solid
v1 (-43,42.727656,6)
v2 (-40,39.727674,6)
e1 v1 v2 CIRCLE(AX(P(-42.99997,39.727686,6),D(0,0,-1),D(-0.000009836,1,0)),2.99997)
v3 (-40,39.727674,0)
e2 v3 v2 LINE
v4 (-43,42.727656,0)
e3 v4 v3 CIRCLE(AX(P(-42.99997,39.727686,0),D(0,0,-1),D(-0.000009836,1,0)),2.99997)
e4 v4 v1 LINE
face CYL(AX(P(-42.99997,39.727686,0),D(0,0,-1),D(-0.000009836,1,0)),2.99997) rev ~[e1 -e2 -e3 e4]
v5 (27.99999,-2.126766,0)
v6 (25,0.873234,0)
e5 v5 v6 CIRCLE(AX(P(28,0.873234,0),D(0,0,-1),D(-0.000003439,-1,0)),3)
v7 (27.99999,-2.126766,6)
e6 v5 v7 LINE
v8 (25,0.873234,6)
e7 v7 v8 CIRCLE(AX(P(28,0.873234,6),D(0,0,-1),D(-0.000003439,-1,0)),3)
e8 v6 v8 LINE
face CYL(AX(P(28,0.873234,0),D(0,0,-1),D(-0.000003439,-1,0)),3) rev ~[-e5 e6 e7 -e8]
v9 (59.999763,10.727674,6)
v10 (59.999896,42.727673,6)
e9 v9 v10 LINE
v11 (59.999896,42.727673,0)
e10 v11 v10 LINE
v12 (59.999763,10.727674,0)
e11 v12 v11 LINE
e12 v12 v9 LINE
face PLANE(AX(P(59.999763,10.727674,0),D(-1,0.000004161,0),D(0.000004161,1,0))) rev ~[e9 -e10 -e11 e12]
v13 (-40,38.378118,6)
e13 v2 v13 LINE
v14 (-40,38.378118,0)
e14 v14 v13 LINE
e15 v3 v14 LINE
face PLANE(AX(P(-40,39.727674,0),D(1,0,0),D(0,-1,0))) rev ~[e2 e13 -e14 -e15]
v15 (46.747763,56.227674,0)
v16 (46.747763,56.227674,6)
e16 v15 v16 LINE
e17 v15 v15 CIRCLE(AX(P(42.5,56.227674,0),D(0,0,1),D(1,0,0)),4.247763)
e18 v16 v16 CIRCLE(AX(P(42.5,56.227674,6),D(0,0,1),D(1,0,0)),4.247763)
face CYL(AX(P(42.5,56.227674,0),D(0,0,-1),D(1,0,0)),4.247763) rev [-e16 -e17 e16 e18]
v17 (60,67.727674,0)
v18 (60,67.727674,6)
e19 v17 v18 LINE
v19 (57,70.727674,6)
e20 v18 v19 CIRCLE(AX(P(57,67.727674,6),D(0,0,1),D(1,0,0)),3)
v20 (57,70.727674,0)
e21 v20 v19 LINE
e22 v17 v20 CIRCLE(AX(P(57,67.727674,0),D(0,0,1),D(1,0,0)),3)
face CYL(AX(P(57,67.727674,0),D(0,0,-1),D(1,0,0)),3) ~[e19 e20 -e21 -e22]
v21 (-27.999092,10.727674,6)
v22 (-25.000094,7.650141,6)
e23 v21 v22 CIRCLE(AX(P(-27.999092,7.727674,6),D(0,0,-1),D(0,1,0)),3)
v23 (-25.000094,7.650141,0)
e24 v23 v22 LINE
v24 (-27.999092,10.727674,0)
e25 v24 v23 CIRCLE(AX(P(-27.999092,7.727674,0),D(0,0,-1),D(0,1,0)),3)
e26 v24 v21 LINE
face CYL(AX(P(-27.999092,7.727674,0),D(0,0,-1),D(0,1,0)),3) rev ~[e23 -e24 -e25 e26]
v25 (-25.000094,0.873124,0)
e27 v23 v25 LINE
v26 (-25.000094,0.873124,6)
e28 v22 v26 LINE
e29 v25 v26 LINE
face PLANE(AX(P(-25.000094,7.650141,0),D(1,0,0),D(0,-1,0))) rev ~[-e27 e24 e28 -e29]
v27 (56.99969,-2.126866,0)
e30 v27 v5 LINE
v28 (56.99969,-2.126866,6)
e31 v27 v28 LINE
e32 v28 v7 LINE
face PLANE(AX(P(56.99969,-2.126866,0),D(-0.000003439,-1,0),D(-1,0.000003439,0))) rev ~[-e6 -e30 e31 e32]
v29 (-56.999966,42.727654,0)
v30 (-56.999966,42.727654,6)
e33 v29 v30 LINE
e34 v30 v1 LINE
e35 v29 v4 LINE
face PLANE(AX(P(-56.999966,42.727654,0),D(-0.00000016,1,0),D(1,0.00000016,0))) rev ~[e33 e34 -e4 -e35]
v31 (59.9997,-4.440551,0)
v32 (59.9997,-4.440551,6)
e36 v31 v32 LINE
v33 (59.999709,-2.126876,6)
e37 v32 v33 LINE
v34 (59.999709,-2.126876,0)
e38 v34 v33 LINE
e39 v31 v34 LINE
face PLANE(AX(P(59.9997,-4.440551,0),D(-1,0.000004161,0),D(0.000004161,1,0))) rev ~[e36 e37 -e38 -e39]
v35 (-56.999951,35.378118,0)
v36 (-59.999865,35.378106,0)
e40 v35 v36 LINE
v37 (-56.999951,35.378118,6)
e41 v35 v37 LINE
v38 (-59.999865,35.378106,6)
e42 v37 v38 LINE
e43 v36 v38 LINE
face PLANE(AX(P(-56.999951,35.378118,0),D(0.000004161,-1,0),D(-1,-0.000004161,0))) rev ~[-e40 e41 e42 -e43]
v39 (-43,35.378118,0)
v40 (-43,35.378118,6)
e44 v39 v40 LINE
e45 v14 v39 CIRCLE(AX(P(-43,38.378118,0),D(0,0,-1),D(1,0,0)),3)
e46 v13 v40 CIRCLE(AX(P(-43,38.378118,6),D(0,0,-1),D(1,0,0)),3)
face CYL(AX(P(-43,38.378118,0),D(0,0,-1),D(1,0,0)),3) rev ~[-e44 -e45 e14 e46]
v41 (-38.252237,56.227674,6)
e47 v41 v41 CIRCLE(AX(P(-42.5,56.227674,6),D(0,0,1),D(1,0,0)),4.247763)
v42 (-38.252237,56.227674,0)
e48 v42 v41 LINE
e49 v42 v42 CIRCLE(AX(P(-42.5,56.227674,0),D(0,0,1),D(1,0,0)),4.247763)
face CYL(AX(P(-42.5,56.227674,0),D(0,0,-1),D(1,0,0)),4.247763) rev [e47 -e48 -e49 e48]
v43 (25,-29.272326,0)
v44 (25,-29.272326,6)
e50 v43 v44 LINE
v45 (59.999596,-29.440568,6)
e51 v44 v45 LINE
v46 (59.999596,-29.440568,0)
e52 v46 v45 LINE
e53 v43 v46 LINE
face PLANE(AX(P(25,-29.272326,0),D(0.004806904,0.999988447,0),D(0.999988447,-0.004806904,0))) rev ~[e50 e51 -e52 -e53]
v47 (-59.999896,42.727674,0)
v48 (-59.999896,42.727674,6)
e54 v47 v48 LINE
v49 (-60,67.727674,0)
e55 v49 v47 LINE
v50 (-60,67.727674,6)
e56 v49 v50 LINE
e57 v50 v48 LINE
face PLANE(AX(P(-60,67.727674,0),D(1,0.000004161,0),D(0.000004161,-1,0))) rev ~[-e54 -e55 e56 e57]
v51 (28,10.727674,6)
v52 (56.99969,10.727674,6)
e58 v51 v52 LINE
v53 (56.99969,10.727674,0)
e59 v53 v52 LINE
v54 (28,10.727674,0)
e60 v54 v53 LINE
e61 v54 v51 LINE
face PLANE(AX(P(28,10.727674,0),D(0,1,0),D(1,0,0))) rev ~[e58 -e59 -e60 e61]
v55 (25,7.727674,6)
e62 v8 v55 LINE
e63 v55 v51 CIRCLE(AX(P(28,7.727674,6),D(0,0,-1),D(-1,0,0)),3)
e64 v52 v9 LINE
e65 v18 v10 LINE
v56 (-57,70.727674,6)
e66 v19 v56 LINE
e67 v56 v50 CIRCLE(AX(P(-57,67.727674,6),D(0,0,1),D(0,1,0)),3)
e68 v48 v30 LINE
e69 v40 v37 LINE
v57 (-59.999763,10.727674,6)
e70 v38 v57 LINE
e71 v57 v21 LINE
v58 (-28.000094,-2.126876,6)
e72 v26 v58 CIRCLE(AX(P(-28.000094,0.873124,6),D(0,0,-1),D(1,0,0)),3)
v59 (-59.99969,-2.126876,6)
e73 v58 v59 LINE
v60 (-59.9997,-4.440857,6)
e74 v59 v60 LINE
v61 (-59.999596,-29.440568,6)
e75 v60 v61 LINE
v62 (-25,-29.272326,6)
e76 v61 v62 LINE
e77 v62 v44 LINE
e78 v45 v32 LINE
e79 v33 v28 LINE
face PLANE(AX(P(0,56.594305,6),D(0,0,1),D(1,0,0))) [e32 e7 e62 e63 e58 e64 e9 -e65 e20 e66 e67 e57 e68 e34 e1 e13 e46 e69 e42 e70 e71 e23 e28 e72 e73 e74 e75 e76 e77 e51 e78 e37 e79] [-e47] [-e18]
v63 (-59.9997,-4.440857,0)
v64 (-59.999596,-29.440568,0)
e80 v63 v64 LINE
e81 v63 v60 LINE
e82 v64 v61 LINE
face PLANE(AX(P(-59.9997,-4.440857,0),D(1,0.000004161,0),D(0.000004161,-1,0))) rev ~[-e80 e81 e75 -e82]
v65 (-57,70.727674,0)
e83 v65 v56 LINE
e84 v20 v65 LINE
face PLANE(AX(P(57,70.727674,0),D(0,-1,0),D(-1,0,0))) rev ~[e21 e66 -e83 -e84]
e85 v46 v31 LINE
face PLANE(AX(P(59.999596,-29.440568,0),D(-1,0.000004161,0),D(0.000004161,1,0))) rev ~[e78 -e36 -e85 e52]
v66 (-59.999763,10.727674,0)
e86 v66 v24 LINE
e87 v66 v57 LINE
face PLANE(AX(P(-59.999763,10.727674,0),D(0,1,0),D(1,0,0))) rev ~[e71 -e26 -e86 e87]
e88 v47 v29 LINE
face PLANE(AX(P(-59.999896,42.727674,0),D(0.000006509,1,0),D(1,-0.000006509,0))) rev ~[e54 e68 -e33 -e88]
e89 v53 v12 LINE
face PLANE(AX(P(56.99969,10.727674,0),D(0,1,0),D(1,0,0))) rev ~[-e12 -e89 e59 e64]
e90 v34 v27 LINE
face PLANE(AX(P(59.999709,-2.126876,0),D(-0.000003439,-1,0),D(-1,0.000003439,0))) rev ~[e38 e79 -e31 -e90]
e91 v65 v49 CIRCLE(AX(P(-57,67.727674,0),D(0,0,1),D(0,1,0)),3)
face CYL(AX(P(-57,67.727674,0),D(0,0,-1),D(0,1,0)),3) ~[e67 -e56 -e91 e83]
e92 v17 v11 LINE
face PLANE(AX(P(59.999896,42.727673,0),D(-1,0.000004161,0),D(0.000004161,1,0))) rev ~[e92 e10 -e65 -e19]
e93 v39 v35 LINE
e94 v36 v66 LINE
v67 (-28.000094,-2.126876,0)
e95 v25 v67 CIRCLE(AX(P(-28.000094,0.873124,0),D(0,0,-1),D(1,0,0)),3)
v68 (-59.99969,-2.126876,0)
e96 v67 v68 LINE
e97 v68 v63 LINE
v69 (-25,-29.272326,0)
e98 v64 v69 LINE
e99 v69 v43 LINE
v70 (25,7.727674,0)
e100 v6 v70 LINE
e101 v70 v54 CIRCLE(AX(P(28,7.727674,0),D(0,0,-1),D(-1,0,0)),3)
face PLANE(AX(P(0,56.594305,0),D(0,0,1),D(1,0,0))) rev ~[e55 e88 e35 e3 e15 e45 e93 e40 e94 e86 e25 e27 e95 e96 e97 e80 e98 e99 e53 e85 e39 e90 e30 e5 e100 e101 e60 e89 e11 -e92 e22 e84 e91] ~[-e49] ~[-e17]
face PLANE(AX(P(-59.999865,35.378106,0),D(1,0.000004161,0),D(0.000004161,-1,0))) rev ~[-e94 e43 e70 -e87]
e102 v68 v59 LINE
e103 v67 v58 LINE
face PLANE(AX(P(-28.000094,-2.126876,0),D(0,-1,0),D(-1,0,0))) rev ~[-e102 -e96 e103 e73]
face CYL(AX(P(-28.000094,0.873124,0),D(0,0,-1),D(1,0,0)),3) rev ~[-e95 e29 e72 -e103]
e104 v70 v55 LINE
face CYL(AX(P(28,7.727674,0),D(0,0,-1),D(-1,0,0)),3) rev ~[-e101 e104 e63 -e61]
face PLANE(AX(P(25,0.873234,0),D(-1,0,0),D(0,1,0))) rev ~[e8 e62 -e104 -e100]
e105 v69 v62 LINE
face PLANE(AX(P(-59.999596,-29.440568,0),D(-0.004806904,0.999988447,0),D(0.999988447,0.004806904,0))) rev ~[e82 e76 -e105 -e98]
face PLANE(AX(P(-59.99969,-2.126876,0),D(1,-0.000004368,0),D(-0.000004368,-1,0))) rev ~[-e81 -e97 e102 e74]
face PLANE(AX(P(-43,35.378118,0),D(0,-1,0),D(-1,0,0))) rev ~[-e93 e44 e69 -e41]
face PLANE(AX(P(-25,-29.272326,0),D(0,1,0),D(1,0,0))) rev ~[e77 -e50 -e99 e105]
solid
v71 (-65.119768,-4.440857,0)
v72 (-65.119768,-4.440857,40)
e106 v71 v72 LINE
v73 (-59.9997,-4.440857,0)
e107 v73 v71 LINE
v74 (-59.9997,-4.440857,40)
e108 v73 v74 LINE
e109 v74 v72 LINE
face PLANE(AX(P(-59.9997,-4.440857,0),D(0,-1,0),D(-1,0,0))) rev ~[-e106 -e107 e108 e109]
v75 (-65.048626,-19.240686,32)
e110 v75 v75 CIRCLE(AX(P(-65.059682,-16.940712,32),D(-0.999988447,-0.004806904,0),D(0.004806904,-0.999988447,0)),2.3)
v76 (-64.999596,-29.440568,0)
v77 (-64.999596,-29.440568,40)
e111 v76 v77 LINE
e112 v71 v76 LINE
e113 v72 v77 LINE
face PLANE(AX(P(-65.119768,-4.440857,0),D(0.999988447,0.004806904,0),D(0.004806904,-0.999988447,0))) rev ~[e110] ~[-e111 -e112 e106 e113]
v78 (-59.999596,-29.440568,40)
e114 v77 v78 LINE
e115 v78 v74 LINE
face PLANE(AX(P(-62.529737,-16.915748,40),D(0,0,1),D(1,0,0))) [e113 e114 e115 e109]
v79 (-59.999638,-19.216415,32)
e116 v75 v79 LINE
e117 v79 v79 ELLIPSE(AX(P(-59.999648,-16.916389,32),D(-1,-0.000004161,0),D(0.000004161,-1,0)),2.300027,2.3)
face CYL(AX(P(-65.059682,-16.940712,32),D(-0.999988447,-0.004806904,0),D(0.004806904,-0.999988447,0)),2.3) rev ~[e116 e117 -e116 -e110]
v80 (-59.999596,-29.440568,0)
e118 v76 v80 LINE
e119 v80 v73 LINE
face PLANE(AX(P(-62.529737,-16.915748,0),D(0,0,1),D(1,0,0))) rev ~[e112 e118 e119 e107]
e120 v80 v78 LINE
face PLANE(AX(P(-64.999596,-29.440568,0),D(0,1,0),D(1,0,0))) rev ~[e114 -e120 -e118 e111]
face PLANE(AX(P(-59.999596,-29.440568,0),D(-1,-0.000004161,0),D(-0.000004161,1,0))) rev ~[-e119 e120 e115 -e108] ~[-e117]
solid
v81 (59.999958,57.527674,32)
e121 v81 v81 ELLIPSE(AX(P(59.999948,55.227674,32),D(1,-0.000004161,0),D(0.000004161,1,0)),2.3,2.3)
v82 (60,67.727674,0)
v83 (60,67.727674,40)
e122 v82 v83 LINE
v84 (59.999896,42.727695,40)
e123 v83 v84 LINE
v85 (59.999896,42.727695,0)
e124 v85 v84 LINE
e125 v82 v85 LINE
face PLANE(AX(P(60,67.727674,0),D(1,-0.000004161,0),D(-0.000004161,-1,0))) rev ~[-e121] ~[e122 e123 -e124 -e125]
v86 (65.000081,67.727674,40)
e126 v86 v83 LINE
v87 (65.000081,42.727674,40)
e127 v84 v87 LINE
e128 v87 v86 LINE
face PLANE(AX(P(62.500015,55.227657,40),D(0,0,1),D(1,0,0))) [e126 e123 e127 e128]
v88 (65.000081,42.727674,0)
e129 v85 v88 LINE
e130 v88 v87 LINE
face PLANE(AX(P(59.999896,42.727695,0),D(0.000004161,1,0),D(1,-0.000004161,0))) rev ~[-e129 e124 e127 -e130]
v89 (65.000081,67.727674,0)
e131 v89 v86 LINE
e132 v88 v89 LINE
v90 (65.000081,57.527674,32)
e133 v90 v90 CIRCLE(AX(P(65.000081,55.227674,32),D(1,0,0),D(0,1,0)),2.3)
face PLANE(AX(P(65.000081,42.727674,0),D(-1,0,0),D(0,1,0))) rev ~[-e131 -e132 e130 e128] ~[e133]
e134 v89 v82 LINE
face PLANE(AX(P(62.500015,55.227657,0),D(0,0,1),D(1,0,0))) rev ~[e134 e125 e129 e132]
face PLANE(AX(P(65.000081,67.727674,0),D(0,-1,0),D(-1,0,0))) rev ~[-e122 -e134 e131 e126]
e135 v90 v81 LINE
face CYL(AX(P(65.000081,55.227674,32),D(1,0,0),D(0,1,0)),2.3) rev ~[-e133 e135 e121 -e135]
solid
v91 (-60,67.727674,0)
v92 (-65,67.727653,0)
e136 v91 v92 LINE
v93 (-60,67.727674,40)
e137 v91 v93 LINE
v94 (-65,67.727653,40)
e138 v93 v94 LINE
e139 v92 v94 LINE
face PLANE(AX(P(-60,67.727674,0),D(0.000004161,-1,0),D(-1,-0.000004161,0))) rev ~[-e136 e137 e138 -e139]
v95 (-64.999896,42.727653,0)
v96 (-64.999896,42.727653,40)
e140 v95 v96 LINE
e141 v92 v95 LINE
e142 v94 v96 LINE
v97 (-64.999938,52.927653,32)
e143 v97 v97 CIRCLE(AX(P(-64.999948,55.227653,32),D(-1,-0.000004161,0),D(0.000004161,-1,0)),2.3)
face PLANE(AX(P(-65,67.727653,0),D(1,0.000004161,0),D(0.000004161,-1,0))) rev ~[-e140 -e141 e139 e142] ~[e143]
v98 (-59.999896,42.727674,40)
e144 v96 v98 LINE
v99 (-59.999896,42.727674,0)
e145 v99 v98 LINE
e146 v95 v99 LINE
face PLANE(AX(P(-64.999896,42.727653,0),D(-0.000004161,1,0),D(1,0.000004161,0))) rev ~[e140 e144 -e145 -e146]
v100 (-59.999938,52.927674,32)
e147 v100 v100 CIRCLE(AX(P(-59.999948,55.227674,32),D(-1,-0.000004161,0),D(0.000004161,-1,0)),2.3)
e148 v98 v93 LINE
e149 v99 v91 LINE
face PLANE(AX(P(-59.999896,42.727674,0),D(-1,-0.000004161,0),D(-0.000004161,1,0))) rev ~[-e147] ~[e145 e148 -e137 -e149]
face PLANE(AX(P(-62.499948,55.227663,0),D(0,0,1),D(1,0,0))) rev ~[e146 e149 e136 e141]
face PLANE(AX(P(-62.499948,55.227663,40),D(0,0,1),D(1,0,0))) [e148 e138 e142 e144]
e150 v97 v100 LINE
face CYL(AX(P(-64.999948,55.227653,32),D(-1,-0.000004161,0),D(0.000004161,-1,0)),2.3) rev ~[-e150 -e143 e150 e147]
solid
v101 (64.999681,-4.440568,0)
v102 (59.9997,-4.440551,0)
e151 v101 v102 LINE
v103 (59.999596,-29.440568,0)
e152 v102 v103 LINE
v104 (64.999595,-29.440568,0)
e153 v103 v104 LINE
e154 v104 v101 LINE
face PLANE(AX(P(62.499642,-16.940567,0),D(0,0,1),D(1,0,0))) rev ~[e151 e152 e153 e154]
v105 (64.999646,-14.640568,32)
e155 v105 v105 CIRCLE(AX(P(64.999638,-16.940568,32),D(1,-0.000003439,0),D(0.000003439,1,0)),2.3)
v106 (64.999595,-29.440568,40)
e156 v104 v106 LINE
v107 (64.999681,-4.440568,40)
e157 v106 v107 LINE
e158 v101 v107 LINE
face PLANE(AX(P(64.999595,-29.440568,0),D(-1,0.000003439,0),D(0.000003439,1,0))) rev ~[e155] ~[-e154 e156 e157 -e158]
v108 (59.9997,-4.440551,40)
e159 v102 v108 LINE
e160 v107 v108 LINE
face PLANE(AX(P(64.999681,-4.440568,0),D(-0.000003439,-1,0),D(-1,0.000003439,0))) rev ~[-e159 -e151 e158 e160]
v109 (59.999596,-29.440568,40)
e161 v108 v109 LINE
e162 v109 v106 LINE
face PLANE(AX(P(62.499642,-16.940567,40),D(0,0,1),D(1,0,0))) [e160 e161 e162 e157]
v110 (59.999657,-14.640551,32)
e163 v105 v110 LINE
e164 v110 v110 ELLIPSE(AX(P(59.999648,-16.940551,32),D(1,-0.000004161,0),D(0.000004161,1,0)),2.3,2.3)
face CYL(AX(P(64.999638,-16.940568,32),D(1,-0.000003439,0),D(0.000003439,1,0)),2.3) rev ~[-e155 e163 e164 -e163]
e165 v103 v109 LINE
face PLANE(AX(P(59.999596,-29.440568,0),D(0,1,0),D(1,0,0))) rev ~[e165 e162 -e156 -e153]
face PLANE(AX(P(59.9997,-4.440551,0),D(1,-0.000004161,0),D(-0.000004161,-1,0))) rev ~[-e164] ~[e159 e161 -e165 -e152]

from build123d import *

# Parameters (mm, degrees)
F1_DEPTH  = 40
F0_R      = 4.2477627918
F2_DEPTH  = 6
F3_R      = 2.3
F4_DEPTH  = 5
F5_R      = 2.3
F6_DEPTH  = 6
F7_R      = 2.3
F8_DEPTH  = 6
F9_R      = 2.3
F10_DEPTH = 6


# Not quite as in the source:
# - ends of sketch curves that miss each other by under 0.0002 mm in the source are joined
# - a feature names something its author has since deleted; it is built from what else it names


with BuildPart() as f1:
    # F0 (on Top) → F1 (new body)
    with BuildSketch(Plane.XY):
        Polygon((64.9996812557, -4.4405678571), (59.9996996739, -4.4405506629), (59.999595637, -29.4405678569), (64.9995952845, -29.4405678569), align=None)
    extrude(amount=F1_DEPTH)

    # F7 (on face) → F8 (cut)
    with BuildSketch(Plane(origin=(64.9996965254, -0.0002235242, 0), x_dir=(3.4388e-06, 1, 0), z_dir=(1, -3.4388e-06, 0))):
        with Locations((-16.9403443329, 32)):
            Circle(F7_R)
    extrude(amount=-F8_DEPTH, mode=Mode.SUBTRACT)


with BuildPart() as f1b:
    # F0 (on Top) → F1, piece 2 (new body)
    with BuildSketch(Plane.XY):
        Polygon((65.0000812269, 67.727673769), (60, 67.727673769), (59.9998959633, 42.7276945771), (65.0000812269, 42.727673769), align=None)
    extrude(amount=F1_DEPTH)

    # F9 (on face) → F10 (cut)
    with BuildSketch(Plane.YZ.offset(65.0000812269)):
        with Locations((55.227673769, 32)):
            Circle(F9_R)
    extrude(amount=-F10_DEPTH, mode=Mode.SUBTRACT)


with BuildPart() as f1c:
    # F0 (on Top) → F1, piece 3 (new body)
    with BuildSketch(Plane.XY):
        Polygon((-59.9998959632, 42.7276737692), (-60, 67.727673769), (-65, 67.7276529616), (-64.9998959631, 42.7276529619), align=None)
    extrude(amount=F1_DEPTH)

    # F3 (on face) → F4 (cut)
    with BuildSketch(Plane(origin=(-64.9997181521, -0.0002704945, 0), x_dir=(4.1615e-06, -1, 0), z_dir=(-1, -4.1615e-06, 0))):
        with Locations((-55.2279234568, 32)):
            Circle(F3_R)
    extrude(amount=-F4_DEPTH, mode=Mode.SUBTRACT)


with BuildPart() as f1d:
    # F0 (on Top) → F1, piece 4 (new body)
    with BuildSketch(Plane.XY):
        Polygon((-59.999595637, -29.4405678569), (-59.9996996726, -4.4408566876), (-65.119768227, -4.4408566876), (-64.999595637, -29.4405678569), align=None)
    extrude(amount=F1_DEPTH)

    # F5 (on face) → F6 (cut)
    with BuildSketch(Plane(origin=(-65.139610072, -0.3131234436, 0), x_dir=(0.0048069036, -0.9999884468, 0), z_dir=(-0.9999884468, -0.0048069036, 0))):
        with Locations((16.6277809332, 32)):
            Circle(F5_R)
    extrude(amount=-F6_DEPTH, mode=Mode.SUBTRACT)


with BuildPart() as f2:
    # F0 (on Top) → F2 (new body)
    with BuildSketch(Plane.XY):
        with BuildLine():
            Line((57, 70.727673769), (0, 70.727673769))
            Line((0, 70.727673769), (-57, 70.727673769))
            ThreePointArc((-57, 70.727673769), (-59.1213203436, 69.8489941126), (-60, 67.727673769))
            Line((-60, 67.727673769), (-59.9998959632, 42.7276737692))
            Line((-59.9998959632, 42.7276737692), (-56.9999663575, 42.7276542423))
            Line((-56.9999663575, 42.7276542423), (-43, 42.727656483))
            Line((-43, 42.727656483), (59.9998959633, 42.7276729687))
            Line((59.9998959633, 42.7276729687), (60, 67.727673769))
            ThreePointArc((60, 67.727673769), (59.1213203436, 69.8489941126), (57, 70.727673769))
        make_face()
        with Locations((-42.5, 56.227673769)):
            Circle(F0_R, mode=Mode.SUBTRACT)
        with Locations((42.5, 56.227673769)):
            Circle(F0_R, mode=Mode.SUBTRACT)
        with BuildLine():
            Line((59.9997627961, 10.7276737687), (59.9998959633, 42.7276945771))
            Line((59.9998959633, 42.7276945771), (-43, 42.727656483))
            ThreePointArc((-43, 42.727656483), (-40.8786796564, 41.8489941126), (-40, 39.727673769))
            Line((-40, 39.727673769), (-40, 38.378118492))
            ThreePointArc((-40, 38.378118492), (-40.8786796564, 36.2567981484), (-43, 35.378118492))
            Line((-43, 35.378118492), (-56.9999512234, 35.378118492))
            Line((-56.9999512234, 35.378118492), (-59.9998653782, 35.3781060079))
            Line((-59.9998653782, 35.3781060079), (-59.9997627961, 10.727673769))
            Line((-59.9997627961, 10.727673769), (-57, 10.727673769))
            Line((-57, 10.727673769), (-27.9990918762, 10.727673769))
            ThreePointArc((-27.9990918762, 10.727673769), (-25.850534475, 9.8214027614), (-25.0000939277, 7.6501411647))
            Line((-25.0000939277, 7.6501411647), (-25.0000939277, 0.8731241727))
            ThreePointArc((-25.0000939277, 0.8731241727), (-25.8787735841, -1.2481961709), (-28.0000939277, -2.1268758273))
            Line((-28.0000939277, -2.1268758273), (-56.9996895647, -2.1268758273))
            Line((-56.9996895647, -2.1268758273), (-59.9996895647, -2.1268758273))
            Line((-59.9996895647, -2.1268758273), (-59.9996996726, -4.4408566876))
            Line((-59.9996996726, -4.4408566876), (-59.999595637, -29.4405678569))
            Line((-59.999595637, -29.4405678569), (-25, -29.272326231))
            Line((-25, -29.272326231), (0, -29.272326231))
            Line((0, -29.272326231), (25, -29.272326231))
            Line((25, -29.272326231), (59.999595637, -29.4405678569))
            Line((59.999595637, -29.4405678569), (59.9996996739, -4.4405506629))
            Line((59.9996996739, -4.4405506629), (59.9997093022, -2.1268758274))
            Line((59.9997093022, -2.1268758274), (56.9996895647, -2.1268655108))
            Line((56.9996895647, -2.1268655108), (27.9999896835, -2.1267657852))
            ThreePointArc((27.9999896835, -2.1267657852), (25.878676009, -1.2480824813), (25, 0.8732342148))
            Line((25, 0.8732342148), (25, 7.727673769))
            ThreePointArc((25, 7.727673769), (25.8786796564, 9.8489941126), (28, 10.727673769))
            Line((28, 10.727673769), (37, 10.727673769))
            Line((37, 10.727673769), (56.9996895647, 10.727673769))
            Line((56.9996895647, 10.727673769), (59.9997627961, 10.7276737687))
        make_face()
    extrude(amount=F2_DEPTH)


solid = Compound([f1.part, f1b.part, f1c.part, f1d.part, f2.part])
